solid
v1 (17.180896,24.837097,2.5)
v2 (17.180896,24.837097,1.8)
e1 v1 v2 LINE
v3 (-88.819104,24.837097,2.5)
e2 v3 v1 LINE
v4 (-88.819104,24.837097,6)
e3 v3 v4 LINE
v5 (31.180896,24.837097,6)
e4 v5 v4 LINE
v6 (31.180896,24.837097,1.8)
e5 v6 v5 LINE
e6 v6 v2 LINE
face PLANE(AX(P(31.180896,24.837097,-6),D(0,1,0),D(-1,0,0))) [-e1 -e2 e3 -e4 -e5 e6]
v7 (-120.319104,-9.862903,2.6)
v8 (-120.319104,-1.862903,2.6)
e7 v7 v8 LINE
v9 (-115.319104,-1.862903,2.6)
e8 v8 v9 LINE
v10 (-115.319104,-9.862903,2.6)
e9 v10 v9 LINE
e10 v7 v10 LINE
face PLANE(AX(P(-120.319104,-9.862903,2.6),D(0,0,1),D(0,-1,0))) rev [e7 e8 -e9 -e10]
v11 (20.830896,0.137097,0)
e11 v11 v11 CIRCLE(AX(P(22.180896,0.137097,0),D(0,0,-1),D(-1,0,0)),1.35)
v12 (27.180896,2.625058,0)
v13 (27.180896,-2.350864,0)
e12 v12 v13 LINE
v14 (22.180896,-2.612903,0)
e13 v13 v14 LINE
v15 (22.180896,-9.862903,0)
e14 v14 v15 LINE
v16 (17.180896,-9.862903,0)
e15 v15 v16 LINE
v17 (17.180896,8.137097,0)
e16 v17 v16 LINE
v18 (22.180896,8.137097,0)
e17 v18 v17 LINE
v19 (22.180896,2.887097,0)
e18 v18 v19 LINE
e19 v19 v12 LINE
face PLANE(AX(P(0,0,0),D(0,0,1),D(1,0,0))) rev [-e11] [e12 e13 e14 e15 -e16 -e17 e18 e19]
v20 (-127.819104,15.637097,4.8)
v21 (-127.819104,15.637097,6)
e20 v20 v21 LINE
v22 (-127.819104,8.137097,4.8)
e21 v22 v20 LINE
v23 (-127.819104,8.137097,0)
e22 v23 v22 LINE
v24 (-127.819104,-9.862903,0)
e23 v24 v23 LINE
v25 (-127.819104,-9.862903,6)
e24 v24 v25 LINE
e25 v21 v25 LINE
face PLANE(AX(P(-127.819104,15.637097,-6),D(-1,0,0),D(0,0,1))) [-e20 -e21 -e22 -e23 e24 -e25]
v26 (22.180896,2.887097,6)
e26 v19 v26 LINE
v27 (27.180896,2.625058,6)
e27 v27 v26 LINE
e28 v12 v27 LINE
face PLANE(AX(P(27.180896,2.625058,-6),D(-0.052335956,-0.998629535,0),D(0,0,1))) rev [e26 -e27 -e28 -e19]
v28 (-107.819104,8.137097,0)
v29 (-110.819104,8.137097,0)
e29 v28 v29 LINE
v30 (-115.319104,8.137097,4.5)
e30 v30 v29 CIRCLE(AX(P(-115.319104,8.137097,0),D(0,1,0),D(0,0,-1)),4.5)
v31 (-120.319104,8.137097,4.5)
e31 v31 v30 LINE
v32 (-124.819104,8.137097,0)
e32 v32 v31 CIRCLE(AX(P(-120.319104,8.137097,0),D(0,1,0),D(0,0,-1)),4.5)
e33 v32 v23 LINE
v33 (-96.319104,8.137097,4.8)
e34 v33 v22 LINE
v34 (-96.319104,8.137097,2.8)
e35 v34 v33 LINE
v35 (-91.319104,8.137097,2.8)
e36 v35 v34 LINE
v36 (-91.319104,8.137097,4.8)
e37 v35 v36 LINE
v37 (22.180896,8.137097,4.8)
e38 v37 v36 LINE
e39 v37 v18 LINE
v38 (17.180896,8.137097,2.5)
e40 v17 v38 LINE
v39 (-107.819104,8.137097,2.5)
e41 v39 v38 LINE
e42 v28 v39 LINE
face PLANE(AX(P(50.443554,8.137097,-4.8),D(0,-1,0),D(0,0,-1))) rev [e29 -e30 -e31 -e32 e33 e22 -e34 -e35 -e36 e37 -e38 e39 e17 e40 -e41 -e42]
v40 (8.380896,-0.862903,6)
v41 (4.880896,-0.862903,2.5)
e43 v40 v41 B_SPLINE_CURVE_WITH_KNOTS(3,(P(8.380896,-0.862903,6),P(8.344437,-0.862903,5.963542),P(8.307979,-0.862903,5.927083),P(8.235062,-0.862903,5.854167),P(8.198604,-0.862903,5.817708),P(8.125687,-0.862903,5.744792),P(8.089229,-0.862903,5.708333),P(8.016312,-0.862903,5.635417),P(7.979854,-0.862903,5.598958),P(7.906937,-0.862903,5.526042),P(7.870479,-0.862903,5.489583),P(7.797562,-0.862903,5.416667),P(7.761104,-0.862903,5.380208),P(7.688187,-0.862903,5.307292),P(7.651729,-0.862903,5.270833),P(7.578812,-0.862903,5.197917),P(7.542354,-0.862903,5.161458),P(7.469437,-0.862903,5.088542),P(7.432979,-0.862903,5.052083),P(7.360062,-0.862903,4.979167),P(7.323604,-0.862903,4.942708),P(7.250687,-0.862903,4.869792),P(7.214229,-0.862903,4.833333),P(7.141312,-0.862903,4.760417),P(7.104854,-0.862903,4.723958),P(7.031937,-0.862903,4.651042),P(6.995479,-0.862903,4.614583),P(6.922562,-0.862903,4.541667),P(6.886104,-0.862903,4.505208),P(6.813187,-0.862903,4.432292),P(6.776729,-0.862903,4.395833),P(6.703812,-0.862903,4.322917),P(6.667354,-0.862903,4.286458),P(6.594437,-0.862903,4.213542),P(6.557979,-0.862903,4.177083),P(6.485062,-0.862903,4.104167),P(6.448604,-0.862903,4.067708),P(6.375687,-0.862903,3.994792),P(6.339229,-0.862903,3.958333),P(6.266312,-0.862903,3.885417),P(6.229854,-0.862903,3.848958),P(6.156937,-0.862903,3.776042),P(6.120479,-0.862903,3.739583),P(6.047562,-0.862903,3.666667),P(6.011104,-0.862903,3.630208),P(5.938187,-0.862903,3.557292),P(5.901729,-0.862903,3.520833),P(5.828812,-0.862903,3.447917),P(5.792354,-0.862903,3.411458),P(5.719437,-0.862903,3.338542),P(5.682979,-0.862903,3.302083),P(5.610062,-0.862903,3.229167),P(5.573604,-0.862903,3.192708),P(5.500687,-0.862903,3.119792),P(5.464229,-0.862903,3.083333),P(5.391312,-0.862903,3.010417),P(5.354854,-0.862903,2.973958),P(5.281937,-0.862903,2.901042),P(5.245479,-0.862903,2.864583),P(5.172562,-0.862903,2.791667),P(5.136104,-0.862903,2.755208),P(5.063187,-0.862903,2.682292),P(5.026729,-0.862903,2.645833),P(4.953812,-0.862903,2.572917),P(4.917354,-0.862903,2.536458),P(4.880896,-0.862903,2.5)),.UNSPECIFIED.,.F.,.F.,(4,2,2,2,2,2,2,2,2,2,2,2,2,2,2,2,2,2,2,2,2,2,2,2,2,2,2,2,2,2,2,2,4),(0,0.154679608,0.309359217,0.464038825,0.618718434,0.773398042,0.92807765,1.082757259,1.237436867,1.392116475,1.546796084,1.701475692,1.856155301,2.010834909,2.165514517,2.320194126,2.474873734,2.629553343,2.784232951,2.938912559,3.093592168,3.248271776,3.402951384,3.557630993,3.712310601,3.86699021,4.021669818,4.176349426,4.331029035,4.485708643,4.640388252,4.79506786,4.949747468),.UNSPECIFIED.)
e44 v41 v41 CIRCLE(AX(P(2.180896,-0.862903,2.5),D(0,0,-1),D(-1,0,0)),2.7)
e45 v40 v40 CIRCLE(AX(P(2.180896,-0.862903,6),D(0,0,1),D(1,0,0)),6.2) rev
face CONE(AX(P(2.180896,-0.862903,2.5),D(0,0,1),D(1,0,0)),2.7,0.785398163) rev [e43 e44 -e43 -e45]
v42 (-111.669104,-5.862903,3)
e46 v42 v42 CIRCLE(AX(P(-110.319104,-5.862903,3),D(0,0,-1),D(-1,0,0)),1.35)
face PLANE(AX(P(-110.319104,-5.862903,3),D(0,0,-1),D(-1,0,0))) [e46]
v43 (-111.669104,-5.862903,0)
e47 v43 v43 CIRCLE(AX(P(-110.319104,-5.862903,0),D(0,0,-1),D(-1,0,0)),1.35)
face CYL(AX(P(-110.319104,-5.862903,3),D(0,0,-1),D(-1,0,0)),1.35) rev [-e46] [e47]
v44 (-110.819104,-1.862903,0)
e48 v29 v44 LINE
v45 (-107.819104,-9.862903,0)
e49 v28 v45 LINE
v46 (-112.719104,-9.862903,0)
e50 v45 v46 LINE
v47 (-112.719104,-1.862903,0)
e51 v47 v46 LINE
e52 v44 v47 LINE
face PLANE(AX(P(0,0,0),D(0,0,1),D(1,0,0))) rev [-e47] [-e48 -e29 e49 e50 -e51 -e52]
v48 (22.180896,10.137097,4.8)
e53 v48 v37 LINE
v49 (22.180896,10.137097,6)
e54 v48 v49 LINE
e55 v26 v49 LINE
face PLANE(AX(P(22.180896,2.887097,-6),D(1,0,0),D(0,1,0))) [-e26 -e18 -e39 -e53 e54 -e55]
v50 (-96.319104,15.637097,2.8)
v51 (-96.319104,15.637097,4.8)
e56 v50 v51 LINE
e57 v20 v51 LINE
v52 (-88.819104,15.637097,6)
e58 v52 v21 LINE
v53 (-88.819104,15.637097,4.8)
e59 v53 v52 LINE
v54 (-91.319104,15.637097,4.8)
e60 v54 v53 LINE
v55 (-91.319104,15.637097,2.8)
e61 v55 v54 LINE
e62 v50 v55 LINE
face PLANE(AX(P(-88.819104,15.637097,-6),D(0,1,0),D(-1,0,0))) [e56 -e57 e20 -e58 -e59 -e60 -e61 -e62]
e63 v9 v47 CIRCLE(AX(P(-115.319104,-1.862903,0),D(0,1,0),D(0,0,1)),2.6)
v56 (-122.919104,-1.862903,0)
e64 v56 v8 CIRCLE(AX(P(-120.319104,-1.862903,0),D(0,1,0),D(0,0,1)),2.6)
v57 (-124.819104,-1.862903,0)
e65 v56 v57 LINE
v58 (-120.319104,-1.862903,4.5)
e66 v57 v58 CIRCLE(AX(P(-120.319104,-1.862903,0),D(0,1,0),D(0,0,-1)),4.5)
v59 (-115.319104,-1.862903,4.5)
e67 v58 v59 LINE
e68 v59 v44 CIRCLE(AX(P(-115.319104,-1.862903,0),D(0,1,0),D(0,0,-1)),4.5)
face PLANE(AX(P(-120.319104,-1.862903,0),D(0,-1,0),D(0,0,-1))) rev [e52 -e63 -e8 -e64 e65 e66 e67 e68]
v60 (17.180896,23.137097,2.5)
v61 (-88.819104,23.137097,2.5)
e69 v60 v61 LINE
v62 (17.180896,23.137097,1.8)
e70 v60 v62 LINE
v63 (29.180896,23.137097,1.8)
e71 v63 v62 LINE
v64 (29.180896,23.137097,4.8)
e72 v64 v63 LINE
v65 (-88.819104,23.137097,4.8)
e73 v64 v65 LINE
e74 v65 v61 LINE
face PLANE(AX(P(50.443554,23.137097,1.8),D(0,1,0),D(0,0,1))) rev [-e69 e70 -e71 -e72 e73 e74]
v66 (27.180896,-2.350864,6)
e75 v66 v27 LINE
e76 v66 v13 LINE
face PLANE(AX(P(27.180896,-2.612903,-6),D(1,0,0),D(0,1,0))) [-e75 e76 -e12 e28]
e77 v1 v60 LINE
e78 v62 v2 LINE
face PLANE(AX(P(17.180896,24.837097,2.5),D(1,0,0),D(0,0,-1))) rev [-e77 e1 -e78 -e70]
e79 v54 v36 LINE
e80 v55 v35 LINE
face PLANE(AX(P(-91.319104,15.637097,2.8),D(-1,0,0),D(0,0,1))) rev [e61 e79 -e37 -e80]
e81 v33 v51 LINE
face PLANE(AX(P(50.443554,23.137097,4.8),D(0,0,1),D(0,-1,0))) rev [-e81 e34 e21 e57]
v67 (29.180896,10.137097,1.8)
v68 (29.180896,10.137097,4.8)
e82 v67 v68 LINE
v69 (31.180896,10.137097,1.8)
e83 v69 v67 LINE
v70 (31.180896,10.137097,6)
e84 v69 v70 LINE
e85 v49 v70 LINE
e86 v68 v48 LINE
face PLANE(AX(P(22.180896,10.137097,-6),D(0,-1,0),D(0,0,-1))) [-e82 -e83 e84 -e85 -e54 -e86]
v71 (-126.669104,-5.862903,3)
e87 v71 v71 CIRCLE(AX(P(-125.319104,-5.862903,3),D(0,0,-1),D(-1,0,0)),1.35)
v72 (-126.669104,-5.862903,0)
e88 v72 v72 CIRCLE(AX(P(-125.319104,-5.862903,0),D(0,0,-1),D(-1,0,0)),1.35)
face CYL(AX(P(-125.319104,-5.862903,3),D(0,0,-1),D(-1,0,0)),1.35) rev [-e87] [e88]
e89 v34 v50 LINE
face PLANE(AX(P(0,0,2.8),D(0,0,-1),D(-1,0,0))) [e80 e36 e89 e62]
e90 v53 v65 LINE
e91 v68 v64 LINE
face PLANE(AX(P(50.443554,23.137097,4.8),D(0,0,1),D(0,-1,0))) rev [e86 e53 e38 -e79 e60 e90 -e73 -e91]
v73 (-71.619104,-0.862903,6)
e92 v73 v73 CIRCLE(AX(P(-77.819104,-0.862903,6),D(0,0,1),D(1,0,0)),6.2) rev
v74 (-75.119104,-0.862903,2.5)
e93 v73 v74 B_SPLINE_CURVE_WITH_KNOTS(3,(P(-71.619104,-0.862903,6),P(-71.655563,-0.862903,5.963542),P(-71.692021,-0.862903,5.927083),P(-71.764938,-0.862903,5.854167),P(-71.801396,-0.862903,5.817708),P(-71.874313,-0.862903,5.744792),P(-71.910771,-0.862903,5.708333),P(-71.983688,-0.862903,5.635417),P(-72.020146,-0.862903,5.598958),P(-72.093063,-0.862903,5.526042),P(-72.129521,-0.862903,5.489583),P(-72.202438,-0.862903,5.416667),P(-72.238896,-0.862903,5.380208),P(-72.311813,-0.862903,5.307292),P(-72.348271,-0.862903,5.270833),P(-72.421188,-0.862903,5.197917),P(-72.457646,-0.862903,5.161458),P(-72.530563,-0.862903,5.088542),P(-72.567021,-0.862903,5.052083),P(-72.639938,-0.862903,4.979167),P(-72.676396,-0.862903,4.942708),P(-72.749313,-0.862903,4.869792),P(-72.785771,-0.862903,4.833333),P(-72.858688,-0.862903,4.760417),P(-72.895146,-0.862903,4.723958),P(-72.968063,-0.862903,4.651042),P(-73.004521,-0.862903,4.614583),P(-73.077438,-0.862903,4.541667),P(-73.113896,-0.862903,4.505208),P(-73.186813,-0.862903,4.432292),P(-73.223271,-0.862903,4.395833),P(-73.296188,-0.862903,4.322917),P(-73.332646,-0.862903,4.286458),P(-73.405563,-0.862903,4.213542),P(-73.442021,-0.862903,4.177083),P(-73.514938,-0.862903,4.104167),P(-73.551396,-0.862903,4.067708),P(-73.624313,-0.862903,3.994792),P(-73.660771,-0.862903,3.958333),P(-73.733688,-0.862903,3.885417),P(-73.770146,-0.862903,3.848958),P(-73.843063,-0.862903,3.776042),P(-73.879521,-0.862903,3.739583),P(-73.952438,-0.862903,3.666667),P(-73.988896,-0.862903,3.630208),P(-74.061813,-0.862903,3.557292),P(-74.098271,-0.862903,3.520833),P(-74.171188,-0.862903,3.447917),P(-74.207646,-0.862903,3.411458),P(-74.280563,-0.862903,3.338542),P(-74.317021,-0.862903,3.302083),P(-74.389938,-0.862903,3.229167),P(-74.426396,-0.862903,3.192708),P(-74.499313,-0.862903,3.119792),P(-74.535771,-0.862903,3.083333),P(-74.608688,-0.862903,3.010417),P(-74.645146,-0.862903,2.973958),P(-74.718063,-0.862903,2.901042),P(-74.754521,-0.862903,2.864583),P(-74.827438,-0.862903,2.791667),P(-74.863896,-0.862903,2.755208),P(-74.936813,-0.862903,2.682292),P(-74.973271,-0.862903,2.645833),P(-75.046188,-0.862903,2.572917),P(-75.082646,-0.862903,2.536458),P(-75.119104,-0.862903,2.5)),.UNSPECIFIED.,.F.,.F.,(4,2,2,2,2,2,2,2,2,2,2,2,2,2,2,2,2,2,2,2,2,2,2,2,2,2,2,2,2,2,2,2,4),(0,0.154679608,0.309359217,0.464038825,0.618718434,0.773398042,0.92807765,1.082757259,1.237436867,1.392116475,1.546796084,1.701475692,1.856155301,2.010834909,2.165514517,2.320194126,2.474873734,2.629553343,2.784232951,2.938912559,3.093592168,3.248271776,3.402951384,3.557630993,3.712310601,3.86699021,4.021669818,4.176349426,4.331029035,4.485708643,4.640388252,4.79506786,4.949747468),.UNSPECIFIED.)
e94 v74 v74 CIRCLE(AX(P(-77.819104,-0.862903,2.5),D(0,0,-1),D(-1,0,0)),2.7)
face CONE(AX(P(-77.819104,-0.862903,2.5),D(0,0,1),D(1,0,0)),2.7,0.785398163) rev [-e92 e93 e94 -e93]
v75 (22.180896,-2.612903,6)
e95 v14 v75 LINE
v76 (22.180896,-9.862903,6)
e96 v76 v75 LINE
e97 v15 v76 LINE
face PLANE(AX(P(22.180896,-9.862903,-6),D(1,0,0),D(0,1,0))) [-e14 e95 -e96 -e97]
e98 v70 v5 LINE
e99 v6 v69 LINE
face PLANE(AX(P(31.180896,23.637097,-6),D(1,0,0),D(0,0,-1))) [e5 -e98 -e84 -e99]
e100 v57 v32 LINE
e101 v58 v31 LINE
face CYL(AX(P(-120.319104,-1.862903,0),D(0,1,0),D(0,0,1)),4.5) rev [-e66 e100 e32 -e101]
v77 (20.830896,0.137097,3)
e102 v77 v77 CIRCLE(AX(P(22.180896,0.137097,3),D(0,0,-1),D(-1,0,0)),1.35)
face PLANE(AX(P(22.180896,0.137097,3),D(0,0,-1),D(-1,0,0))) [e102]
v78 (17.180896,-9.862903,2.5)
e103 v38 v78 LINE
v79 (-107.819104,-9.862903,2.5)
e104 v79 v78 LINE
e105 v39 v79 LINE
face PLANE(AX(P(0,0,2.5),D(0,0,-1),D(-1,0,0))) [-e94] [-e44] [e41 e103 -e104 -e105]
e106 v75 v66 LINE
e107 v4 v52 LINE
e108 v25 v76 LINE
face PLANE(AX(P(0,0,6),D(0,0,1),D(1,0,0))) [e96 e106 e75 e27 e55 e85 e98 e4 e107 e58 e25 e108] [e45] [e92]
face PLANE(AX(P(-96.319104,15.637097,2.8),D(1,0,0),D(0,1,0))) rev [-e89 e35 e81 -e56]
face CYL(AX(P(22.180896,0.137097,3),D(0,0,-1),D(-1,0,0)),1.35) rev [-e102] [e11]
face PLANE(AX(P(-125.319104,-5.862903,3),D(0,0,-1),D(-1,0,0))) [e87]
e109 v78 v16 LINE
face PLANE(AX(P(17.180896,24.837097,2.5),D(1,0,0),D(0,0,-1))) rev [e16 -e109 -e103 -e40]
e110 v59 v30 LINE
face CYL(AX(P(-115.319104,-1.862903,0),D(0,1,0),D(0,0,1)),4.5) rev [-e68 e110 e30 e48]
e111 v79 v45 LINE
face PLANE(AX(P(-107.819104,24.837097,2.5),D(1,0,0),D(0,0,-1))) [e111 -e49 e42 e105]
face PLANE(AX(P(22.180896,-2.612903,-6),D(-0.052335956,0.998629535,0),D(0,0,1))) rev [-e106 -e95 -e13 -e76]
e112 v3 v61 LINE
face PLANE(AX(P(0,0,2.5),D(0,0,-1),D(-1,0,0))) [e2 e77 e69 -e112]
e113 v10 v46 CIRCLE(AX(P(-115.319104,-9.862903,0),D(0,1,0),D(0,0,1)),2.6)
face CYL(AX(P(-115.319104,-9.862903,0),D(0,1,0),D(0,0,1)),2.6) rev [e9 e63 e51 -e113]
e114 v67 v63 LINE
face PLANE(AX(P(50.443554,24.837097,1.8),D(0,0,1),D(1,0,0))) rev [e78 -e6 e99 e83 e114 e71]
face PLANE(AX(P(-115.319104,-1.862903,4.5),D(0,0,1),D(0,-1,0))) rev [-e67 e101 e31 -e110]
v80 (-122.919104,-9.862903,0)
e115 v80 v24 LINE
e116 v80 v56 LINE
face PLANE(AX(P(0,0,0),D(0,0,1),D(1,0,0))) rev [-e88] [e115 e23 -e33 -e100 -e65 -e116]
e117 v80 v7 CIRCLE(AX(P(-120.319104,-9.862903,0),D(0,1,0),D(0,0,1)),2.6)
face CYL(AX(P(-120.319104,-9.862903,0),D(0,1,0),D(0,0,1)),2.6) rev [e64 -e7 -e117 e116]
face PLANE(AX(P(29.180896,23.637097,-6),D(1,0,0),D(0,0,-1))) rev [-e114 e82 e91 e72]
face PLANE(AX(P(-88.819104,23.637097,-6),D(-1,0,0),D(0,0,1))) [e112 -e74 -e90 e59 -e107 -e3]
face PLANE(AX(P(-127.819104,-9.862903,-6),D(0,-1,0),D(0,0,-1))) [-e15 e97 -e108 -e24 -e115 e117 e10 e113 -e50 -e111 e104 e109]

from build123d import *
from OCP.BRepFilletAPI import BRepFilletAPI_MakeChamfer

# Parameters (mm, degrees)
BOSS_EXTRUDE1_DEPTH      = 6
BOSS_EXTRUDE1_DEPTH_BACK = 6
CUT_EXTRUDE1_DEPTH       = 157
CUT_EXTRUDE4_DEPTH       = 2.5
CUT_EXTRUDE4_DEPTH_BACK  = 2.5
SKETCH8_W                = 125
SKETCH8_H                = 34.7
CUT_EXTRUDE5_DEPTH       = 131.348014108
CUT_EXTRUDE5_DEPTH_BACK  = 131.348014108
SKETCH9_R                = 2.7
CHAMFER2_SIZE            = 5
CHAMFER2_SIZE_2          = 0.262038896
CUT_EXTRUDE8_DEPTH       = 10
CUT_EXTRUDE9_DEPTH       = 131.715773363
SKETCH16_W               = 214.344642296
SKETCH16_H               = 84.645654919
CUT_EXTRUDE10_DEPTH      = 131.348014108
SKETCH17_W               = 2
SKETCH17_H               = 14.7
CUT_EXTRUDE11_DEPTH      = 1.8
SKETCH18_R               = 1.35
CUT_EXTRUDE12_DEPTH      = 3
CHAMFER7_SIZE            = 3.5
SKETCH19_W               = 5
SKETCH19_H               = 7.5
BOSS_EXTRUDE2_DEPTH      = 2


with BuildPart() as part:
    # Sketch1 → Boss-Extrude1 (new, two sides: drawn at the far end of the back side and taken through both)
    with BuildSketch(Plane.XY.offset(-BOSS_EXTRUDE1_DEPTH_BACK)):
        Polygon((-127.819104229, -9.862903226), (22.180895771, -9.862903226), (22.180895771, -2.612903226), (27.180895771, -2.612903226), (27.180895771, 2.887096774), (22.180895771, 2.887096774), (22.180895771, 10.137096774), (31.180895771, 10.137096774), (31.180895771, 23.637096774), (31.180895771, 24.837096774), (-88.819104229, 24.837096774), (-88.819104229, 23.637096774), (-88.819104229, 15.637096774), (-127.819104229, 15.637096774), align=None)
    extrude(amount=BOSS_EXTRUDE1_DEPTH + BOSS_EXTRUDE1_DEPTH_BACK)

    # Sketch2 → Cut-Extrude1 (cut)
    with BuildSketch(Plane.ZY.offset(127.819104229)):
        Polygon((-4.8, 23.137096774), (-4.8, 8.137096774), (4.8, 8.137096774), (4.8, 23.137096774), (1.8, 23.137096774), (1.8, 24.837096774), (-1.8, 24.837096774), (-1.8, 23.137096774), align=None)
    extrude(amount=-CUT_EXTRUDE1_DEPTH, mode=Mode.SUBTRACT)

    # Sketch8 → Cut-Extrude4 (cut, two sides: drawn at the far end of the back side and taken through both)
    with BuildSketch(Plane.XY.offset(-CUT_EXTRUDE4_DEPTH_BACK)):
        with Locations((-45.319104229, 7.487096774)):
            Rectangle(SKETCH8_W, SKETCH8_H)
    extrude(amount=CUT_EXTRUDE4_DEPTH + CUT_EXTRUDE4_DEPTH_BACK, mode=Mode.SUBTRACT)

    # Sketch9 → Cut-Extrude5 (cut, two sides: drawn at the far end of the back side and taken through both)
    with BuildSketch(Plane.XY.offset(-CUT_EXTRUDE5_DEPTH_BACK)):
        with Locations((-77.819104229, -0.862903226)):
            Circle(SKETCH9_R)
        with Locations((2.180895771, -0.862903226)):
            Circle(SKETCH9_R)
    extrude(amount=CUT_EXTRUDE5_DEPTH + CUT_EXTRUDE5_DEPTH_BACK, mode=Mode.SUBTRACT)

    # Chamfer2
    chamfer2_edges_1 = [part.edges().sort_by_distance(p)[0] for p in [
        (27.180895771, -2.612903226, 0),
    ]]
    chamfer2_side_1 = [part.faces().sort_by_distance(p)[0] for p in [
        (27.175654993, -2.612903226, 0),
    ]]
    chamfer2_edges_2 = [part.edges().sort_by_distance(p)[0] for p in [
        (27.180895771, 2.887096774, 0),
    ]]
    chamfer2_side_2 = [part.faces().sort_by_distance(p)[0] for p in [
        (27.180895771, 2.881855996, 0),
    ]]
    chamfer2 = BRepFilletAPI_MakeChamfer(part.part.solid().wrapped)
    for e in chamfer2_edges_1:
        chamfer2.Add(CHAMFER2_SIZE - 0.0001, CHAMFER2_SIZE_2 - 0.0001, e.wrapped, chamfer2_side_1[0].wrapped)
    for e in chamfer2_edges_2:
        chamfer2.Add(CHAMFER2_SIZE_2 - 0.0001, CHAMFER2_SIZE - 0.0001, e.wrapped, chamfer2_side_2[0].wrapped)
    add(Compound.cast(chamfer2.Shape()), mode=Mode.REPLACE)  # a hair under: the kernel refuses the full size

    # Sketch14 → Cut-Extrude8 (cut)
    with BuildSketch(Plane(origin=(0, 8.137096774, 0), x_dir=(1, 0, 0), z_dir=(0, 1, 0))):
        with BuildLine():
            Line((-120.319104229, 4.5), (-115.319104229, 4.5))
            ThreePointArc((-115.319104229, 4.5), (-110.819104229, 0), (-115.319104229, -4.5))
            Line((-115.319104229, -4.5), (-120.319104229, -4.5))
            ThreePointArc((-120.319104229, -4.5), (-124.819104229, 0), (-120.319104229, 4.5))
        make_face()
    extrude(amount=-CUT_EXTRUDE8_DEPTH, mode=Mode.SUBTRACT)

    # Sketch15 → Cut-Extrude9 (cut, through all)
    with BuildSketch(Plane(origin=(0, -1.862903226, 0), x_dir=(1, 0, 0), z_dir=(0, 1, 0))):
        with BuildLine():
            Line((-120.319104229, -2.6), (-115.319104229, -2.6))
            ThreePointArc((-115.319104229, -2.6), (-112.719104229, 0), (-115.319104229, 2.6))
            Line((-115.319104229, 2.6), (-120.319104229, 2.6))
            ThreePointArc((-120.319104229, 2.6), (-122.919104229, 0), (-120.319104229, -2.6))
        make_face()
    extrude(amount=-CUT_EXTRUDE9_DEPTH, mode=Mode.SUBTRACT)

    # Sketch16 → Cut-Extrude10 (cut, through all)
    with BuildSketch(Plane.XY):
        with Locations((-30.272765953, 16.776086779)):
            Rectangle(SKETCH16_W, SKETCH16_H)
    extrude(amount=-CUT_EXTRUDE10_DEPTH, mode=Mode.SUBTRACT)

    # Sketch17 → Cut-Extrude11 (cut)
    with BuildSketch(Plane(origin=(0, 0, 0), x_dir=(-1, 0, 0), z_dir=(0, 0, -1))):
        with Locations((-30.180895771, 17.487096774)):
            Rectangle(SKETCH17_W, SKETCH17_H)
    extrude(amount=-CUT_EXTRUDE11_DEPTH, mode=Mode.SUBTRACT)

    # Sketch18 → Cut-Extrude12 (cut)
    with BuildSketch(Plane(origin=(0, 0, 0), x_dir=(-1, 0, 0), z_dir=(0, 0, -1))):
        with Locations((110.319104229, -5.862903226)):
            Circle(SKETCH18_R)
        with Locations((125.319104229, -5.862903226)):
            Circle(SKETCH18_R)
        with Locations((-22.180895771, 0.137096774)):
            Circle(SKETCH18_R)
    extrude(amount=-CUT_EXTRUDE12_DEPTH, mode=Mode.SUBTRACT)

    # Chamfer7
    chamfer7_edges = [part.edges().sort_by_distance(p)[0] for p in [
        (-80.519104229, -0.862903226, 6),
        (-0.519104229, -0.862903226, 6),
    ]]
    chamfer(chamfer7_edges, length=CHAMFER7_SIZE - 0.0001)  # a hair under: the kernel refuses the full size

    # Sketch19 → Boss-Extrude2 (add)
    with BuildSketch(Plane(origin=(0, 0, 4.8), x_dir=(-1, 0, 0), z_dir=(0, 0, -1))):
        with Locations((93.819104229, 11.887096774)):
            Rectangle(SKETCH19_W, SKETCH19_H)
    extrude(amount=BOSS_EXTRUDE2_DEPTH)


solid = part.part
